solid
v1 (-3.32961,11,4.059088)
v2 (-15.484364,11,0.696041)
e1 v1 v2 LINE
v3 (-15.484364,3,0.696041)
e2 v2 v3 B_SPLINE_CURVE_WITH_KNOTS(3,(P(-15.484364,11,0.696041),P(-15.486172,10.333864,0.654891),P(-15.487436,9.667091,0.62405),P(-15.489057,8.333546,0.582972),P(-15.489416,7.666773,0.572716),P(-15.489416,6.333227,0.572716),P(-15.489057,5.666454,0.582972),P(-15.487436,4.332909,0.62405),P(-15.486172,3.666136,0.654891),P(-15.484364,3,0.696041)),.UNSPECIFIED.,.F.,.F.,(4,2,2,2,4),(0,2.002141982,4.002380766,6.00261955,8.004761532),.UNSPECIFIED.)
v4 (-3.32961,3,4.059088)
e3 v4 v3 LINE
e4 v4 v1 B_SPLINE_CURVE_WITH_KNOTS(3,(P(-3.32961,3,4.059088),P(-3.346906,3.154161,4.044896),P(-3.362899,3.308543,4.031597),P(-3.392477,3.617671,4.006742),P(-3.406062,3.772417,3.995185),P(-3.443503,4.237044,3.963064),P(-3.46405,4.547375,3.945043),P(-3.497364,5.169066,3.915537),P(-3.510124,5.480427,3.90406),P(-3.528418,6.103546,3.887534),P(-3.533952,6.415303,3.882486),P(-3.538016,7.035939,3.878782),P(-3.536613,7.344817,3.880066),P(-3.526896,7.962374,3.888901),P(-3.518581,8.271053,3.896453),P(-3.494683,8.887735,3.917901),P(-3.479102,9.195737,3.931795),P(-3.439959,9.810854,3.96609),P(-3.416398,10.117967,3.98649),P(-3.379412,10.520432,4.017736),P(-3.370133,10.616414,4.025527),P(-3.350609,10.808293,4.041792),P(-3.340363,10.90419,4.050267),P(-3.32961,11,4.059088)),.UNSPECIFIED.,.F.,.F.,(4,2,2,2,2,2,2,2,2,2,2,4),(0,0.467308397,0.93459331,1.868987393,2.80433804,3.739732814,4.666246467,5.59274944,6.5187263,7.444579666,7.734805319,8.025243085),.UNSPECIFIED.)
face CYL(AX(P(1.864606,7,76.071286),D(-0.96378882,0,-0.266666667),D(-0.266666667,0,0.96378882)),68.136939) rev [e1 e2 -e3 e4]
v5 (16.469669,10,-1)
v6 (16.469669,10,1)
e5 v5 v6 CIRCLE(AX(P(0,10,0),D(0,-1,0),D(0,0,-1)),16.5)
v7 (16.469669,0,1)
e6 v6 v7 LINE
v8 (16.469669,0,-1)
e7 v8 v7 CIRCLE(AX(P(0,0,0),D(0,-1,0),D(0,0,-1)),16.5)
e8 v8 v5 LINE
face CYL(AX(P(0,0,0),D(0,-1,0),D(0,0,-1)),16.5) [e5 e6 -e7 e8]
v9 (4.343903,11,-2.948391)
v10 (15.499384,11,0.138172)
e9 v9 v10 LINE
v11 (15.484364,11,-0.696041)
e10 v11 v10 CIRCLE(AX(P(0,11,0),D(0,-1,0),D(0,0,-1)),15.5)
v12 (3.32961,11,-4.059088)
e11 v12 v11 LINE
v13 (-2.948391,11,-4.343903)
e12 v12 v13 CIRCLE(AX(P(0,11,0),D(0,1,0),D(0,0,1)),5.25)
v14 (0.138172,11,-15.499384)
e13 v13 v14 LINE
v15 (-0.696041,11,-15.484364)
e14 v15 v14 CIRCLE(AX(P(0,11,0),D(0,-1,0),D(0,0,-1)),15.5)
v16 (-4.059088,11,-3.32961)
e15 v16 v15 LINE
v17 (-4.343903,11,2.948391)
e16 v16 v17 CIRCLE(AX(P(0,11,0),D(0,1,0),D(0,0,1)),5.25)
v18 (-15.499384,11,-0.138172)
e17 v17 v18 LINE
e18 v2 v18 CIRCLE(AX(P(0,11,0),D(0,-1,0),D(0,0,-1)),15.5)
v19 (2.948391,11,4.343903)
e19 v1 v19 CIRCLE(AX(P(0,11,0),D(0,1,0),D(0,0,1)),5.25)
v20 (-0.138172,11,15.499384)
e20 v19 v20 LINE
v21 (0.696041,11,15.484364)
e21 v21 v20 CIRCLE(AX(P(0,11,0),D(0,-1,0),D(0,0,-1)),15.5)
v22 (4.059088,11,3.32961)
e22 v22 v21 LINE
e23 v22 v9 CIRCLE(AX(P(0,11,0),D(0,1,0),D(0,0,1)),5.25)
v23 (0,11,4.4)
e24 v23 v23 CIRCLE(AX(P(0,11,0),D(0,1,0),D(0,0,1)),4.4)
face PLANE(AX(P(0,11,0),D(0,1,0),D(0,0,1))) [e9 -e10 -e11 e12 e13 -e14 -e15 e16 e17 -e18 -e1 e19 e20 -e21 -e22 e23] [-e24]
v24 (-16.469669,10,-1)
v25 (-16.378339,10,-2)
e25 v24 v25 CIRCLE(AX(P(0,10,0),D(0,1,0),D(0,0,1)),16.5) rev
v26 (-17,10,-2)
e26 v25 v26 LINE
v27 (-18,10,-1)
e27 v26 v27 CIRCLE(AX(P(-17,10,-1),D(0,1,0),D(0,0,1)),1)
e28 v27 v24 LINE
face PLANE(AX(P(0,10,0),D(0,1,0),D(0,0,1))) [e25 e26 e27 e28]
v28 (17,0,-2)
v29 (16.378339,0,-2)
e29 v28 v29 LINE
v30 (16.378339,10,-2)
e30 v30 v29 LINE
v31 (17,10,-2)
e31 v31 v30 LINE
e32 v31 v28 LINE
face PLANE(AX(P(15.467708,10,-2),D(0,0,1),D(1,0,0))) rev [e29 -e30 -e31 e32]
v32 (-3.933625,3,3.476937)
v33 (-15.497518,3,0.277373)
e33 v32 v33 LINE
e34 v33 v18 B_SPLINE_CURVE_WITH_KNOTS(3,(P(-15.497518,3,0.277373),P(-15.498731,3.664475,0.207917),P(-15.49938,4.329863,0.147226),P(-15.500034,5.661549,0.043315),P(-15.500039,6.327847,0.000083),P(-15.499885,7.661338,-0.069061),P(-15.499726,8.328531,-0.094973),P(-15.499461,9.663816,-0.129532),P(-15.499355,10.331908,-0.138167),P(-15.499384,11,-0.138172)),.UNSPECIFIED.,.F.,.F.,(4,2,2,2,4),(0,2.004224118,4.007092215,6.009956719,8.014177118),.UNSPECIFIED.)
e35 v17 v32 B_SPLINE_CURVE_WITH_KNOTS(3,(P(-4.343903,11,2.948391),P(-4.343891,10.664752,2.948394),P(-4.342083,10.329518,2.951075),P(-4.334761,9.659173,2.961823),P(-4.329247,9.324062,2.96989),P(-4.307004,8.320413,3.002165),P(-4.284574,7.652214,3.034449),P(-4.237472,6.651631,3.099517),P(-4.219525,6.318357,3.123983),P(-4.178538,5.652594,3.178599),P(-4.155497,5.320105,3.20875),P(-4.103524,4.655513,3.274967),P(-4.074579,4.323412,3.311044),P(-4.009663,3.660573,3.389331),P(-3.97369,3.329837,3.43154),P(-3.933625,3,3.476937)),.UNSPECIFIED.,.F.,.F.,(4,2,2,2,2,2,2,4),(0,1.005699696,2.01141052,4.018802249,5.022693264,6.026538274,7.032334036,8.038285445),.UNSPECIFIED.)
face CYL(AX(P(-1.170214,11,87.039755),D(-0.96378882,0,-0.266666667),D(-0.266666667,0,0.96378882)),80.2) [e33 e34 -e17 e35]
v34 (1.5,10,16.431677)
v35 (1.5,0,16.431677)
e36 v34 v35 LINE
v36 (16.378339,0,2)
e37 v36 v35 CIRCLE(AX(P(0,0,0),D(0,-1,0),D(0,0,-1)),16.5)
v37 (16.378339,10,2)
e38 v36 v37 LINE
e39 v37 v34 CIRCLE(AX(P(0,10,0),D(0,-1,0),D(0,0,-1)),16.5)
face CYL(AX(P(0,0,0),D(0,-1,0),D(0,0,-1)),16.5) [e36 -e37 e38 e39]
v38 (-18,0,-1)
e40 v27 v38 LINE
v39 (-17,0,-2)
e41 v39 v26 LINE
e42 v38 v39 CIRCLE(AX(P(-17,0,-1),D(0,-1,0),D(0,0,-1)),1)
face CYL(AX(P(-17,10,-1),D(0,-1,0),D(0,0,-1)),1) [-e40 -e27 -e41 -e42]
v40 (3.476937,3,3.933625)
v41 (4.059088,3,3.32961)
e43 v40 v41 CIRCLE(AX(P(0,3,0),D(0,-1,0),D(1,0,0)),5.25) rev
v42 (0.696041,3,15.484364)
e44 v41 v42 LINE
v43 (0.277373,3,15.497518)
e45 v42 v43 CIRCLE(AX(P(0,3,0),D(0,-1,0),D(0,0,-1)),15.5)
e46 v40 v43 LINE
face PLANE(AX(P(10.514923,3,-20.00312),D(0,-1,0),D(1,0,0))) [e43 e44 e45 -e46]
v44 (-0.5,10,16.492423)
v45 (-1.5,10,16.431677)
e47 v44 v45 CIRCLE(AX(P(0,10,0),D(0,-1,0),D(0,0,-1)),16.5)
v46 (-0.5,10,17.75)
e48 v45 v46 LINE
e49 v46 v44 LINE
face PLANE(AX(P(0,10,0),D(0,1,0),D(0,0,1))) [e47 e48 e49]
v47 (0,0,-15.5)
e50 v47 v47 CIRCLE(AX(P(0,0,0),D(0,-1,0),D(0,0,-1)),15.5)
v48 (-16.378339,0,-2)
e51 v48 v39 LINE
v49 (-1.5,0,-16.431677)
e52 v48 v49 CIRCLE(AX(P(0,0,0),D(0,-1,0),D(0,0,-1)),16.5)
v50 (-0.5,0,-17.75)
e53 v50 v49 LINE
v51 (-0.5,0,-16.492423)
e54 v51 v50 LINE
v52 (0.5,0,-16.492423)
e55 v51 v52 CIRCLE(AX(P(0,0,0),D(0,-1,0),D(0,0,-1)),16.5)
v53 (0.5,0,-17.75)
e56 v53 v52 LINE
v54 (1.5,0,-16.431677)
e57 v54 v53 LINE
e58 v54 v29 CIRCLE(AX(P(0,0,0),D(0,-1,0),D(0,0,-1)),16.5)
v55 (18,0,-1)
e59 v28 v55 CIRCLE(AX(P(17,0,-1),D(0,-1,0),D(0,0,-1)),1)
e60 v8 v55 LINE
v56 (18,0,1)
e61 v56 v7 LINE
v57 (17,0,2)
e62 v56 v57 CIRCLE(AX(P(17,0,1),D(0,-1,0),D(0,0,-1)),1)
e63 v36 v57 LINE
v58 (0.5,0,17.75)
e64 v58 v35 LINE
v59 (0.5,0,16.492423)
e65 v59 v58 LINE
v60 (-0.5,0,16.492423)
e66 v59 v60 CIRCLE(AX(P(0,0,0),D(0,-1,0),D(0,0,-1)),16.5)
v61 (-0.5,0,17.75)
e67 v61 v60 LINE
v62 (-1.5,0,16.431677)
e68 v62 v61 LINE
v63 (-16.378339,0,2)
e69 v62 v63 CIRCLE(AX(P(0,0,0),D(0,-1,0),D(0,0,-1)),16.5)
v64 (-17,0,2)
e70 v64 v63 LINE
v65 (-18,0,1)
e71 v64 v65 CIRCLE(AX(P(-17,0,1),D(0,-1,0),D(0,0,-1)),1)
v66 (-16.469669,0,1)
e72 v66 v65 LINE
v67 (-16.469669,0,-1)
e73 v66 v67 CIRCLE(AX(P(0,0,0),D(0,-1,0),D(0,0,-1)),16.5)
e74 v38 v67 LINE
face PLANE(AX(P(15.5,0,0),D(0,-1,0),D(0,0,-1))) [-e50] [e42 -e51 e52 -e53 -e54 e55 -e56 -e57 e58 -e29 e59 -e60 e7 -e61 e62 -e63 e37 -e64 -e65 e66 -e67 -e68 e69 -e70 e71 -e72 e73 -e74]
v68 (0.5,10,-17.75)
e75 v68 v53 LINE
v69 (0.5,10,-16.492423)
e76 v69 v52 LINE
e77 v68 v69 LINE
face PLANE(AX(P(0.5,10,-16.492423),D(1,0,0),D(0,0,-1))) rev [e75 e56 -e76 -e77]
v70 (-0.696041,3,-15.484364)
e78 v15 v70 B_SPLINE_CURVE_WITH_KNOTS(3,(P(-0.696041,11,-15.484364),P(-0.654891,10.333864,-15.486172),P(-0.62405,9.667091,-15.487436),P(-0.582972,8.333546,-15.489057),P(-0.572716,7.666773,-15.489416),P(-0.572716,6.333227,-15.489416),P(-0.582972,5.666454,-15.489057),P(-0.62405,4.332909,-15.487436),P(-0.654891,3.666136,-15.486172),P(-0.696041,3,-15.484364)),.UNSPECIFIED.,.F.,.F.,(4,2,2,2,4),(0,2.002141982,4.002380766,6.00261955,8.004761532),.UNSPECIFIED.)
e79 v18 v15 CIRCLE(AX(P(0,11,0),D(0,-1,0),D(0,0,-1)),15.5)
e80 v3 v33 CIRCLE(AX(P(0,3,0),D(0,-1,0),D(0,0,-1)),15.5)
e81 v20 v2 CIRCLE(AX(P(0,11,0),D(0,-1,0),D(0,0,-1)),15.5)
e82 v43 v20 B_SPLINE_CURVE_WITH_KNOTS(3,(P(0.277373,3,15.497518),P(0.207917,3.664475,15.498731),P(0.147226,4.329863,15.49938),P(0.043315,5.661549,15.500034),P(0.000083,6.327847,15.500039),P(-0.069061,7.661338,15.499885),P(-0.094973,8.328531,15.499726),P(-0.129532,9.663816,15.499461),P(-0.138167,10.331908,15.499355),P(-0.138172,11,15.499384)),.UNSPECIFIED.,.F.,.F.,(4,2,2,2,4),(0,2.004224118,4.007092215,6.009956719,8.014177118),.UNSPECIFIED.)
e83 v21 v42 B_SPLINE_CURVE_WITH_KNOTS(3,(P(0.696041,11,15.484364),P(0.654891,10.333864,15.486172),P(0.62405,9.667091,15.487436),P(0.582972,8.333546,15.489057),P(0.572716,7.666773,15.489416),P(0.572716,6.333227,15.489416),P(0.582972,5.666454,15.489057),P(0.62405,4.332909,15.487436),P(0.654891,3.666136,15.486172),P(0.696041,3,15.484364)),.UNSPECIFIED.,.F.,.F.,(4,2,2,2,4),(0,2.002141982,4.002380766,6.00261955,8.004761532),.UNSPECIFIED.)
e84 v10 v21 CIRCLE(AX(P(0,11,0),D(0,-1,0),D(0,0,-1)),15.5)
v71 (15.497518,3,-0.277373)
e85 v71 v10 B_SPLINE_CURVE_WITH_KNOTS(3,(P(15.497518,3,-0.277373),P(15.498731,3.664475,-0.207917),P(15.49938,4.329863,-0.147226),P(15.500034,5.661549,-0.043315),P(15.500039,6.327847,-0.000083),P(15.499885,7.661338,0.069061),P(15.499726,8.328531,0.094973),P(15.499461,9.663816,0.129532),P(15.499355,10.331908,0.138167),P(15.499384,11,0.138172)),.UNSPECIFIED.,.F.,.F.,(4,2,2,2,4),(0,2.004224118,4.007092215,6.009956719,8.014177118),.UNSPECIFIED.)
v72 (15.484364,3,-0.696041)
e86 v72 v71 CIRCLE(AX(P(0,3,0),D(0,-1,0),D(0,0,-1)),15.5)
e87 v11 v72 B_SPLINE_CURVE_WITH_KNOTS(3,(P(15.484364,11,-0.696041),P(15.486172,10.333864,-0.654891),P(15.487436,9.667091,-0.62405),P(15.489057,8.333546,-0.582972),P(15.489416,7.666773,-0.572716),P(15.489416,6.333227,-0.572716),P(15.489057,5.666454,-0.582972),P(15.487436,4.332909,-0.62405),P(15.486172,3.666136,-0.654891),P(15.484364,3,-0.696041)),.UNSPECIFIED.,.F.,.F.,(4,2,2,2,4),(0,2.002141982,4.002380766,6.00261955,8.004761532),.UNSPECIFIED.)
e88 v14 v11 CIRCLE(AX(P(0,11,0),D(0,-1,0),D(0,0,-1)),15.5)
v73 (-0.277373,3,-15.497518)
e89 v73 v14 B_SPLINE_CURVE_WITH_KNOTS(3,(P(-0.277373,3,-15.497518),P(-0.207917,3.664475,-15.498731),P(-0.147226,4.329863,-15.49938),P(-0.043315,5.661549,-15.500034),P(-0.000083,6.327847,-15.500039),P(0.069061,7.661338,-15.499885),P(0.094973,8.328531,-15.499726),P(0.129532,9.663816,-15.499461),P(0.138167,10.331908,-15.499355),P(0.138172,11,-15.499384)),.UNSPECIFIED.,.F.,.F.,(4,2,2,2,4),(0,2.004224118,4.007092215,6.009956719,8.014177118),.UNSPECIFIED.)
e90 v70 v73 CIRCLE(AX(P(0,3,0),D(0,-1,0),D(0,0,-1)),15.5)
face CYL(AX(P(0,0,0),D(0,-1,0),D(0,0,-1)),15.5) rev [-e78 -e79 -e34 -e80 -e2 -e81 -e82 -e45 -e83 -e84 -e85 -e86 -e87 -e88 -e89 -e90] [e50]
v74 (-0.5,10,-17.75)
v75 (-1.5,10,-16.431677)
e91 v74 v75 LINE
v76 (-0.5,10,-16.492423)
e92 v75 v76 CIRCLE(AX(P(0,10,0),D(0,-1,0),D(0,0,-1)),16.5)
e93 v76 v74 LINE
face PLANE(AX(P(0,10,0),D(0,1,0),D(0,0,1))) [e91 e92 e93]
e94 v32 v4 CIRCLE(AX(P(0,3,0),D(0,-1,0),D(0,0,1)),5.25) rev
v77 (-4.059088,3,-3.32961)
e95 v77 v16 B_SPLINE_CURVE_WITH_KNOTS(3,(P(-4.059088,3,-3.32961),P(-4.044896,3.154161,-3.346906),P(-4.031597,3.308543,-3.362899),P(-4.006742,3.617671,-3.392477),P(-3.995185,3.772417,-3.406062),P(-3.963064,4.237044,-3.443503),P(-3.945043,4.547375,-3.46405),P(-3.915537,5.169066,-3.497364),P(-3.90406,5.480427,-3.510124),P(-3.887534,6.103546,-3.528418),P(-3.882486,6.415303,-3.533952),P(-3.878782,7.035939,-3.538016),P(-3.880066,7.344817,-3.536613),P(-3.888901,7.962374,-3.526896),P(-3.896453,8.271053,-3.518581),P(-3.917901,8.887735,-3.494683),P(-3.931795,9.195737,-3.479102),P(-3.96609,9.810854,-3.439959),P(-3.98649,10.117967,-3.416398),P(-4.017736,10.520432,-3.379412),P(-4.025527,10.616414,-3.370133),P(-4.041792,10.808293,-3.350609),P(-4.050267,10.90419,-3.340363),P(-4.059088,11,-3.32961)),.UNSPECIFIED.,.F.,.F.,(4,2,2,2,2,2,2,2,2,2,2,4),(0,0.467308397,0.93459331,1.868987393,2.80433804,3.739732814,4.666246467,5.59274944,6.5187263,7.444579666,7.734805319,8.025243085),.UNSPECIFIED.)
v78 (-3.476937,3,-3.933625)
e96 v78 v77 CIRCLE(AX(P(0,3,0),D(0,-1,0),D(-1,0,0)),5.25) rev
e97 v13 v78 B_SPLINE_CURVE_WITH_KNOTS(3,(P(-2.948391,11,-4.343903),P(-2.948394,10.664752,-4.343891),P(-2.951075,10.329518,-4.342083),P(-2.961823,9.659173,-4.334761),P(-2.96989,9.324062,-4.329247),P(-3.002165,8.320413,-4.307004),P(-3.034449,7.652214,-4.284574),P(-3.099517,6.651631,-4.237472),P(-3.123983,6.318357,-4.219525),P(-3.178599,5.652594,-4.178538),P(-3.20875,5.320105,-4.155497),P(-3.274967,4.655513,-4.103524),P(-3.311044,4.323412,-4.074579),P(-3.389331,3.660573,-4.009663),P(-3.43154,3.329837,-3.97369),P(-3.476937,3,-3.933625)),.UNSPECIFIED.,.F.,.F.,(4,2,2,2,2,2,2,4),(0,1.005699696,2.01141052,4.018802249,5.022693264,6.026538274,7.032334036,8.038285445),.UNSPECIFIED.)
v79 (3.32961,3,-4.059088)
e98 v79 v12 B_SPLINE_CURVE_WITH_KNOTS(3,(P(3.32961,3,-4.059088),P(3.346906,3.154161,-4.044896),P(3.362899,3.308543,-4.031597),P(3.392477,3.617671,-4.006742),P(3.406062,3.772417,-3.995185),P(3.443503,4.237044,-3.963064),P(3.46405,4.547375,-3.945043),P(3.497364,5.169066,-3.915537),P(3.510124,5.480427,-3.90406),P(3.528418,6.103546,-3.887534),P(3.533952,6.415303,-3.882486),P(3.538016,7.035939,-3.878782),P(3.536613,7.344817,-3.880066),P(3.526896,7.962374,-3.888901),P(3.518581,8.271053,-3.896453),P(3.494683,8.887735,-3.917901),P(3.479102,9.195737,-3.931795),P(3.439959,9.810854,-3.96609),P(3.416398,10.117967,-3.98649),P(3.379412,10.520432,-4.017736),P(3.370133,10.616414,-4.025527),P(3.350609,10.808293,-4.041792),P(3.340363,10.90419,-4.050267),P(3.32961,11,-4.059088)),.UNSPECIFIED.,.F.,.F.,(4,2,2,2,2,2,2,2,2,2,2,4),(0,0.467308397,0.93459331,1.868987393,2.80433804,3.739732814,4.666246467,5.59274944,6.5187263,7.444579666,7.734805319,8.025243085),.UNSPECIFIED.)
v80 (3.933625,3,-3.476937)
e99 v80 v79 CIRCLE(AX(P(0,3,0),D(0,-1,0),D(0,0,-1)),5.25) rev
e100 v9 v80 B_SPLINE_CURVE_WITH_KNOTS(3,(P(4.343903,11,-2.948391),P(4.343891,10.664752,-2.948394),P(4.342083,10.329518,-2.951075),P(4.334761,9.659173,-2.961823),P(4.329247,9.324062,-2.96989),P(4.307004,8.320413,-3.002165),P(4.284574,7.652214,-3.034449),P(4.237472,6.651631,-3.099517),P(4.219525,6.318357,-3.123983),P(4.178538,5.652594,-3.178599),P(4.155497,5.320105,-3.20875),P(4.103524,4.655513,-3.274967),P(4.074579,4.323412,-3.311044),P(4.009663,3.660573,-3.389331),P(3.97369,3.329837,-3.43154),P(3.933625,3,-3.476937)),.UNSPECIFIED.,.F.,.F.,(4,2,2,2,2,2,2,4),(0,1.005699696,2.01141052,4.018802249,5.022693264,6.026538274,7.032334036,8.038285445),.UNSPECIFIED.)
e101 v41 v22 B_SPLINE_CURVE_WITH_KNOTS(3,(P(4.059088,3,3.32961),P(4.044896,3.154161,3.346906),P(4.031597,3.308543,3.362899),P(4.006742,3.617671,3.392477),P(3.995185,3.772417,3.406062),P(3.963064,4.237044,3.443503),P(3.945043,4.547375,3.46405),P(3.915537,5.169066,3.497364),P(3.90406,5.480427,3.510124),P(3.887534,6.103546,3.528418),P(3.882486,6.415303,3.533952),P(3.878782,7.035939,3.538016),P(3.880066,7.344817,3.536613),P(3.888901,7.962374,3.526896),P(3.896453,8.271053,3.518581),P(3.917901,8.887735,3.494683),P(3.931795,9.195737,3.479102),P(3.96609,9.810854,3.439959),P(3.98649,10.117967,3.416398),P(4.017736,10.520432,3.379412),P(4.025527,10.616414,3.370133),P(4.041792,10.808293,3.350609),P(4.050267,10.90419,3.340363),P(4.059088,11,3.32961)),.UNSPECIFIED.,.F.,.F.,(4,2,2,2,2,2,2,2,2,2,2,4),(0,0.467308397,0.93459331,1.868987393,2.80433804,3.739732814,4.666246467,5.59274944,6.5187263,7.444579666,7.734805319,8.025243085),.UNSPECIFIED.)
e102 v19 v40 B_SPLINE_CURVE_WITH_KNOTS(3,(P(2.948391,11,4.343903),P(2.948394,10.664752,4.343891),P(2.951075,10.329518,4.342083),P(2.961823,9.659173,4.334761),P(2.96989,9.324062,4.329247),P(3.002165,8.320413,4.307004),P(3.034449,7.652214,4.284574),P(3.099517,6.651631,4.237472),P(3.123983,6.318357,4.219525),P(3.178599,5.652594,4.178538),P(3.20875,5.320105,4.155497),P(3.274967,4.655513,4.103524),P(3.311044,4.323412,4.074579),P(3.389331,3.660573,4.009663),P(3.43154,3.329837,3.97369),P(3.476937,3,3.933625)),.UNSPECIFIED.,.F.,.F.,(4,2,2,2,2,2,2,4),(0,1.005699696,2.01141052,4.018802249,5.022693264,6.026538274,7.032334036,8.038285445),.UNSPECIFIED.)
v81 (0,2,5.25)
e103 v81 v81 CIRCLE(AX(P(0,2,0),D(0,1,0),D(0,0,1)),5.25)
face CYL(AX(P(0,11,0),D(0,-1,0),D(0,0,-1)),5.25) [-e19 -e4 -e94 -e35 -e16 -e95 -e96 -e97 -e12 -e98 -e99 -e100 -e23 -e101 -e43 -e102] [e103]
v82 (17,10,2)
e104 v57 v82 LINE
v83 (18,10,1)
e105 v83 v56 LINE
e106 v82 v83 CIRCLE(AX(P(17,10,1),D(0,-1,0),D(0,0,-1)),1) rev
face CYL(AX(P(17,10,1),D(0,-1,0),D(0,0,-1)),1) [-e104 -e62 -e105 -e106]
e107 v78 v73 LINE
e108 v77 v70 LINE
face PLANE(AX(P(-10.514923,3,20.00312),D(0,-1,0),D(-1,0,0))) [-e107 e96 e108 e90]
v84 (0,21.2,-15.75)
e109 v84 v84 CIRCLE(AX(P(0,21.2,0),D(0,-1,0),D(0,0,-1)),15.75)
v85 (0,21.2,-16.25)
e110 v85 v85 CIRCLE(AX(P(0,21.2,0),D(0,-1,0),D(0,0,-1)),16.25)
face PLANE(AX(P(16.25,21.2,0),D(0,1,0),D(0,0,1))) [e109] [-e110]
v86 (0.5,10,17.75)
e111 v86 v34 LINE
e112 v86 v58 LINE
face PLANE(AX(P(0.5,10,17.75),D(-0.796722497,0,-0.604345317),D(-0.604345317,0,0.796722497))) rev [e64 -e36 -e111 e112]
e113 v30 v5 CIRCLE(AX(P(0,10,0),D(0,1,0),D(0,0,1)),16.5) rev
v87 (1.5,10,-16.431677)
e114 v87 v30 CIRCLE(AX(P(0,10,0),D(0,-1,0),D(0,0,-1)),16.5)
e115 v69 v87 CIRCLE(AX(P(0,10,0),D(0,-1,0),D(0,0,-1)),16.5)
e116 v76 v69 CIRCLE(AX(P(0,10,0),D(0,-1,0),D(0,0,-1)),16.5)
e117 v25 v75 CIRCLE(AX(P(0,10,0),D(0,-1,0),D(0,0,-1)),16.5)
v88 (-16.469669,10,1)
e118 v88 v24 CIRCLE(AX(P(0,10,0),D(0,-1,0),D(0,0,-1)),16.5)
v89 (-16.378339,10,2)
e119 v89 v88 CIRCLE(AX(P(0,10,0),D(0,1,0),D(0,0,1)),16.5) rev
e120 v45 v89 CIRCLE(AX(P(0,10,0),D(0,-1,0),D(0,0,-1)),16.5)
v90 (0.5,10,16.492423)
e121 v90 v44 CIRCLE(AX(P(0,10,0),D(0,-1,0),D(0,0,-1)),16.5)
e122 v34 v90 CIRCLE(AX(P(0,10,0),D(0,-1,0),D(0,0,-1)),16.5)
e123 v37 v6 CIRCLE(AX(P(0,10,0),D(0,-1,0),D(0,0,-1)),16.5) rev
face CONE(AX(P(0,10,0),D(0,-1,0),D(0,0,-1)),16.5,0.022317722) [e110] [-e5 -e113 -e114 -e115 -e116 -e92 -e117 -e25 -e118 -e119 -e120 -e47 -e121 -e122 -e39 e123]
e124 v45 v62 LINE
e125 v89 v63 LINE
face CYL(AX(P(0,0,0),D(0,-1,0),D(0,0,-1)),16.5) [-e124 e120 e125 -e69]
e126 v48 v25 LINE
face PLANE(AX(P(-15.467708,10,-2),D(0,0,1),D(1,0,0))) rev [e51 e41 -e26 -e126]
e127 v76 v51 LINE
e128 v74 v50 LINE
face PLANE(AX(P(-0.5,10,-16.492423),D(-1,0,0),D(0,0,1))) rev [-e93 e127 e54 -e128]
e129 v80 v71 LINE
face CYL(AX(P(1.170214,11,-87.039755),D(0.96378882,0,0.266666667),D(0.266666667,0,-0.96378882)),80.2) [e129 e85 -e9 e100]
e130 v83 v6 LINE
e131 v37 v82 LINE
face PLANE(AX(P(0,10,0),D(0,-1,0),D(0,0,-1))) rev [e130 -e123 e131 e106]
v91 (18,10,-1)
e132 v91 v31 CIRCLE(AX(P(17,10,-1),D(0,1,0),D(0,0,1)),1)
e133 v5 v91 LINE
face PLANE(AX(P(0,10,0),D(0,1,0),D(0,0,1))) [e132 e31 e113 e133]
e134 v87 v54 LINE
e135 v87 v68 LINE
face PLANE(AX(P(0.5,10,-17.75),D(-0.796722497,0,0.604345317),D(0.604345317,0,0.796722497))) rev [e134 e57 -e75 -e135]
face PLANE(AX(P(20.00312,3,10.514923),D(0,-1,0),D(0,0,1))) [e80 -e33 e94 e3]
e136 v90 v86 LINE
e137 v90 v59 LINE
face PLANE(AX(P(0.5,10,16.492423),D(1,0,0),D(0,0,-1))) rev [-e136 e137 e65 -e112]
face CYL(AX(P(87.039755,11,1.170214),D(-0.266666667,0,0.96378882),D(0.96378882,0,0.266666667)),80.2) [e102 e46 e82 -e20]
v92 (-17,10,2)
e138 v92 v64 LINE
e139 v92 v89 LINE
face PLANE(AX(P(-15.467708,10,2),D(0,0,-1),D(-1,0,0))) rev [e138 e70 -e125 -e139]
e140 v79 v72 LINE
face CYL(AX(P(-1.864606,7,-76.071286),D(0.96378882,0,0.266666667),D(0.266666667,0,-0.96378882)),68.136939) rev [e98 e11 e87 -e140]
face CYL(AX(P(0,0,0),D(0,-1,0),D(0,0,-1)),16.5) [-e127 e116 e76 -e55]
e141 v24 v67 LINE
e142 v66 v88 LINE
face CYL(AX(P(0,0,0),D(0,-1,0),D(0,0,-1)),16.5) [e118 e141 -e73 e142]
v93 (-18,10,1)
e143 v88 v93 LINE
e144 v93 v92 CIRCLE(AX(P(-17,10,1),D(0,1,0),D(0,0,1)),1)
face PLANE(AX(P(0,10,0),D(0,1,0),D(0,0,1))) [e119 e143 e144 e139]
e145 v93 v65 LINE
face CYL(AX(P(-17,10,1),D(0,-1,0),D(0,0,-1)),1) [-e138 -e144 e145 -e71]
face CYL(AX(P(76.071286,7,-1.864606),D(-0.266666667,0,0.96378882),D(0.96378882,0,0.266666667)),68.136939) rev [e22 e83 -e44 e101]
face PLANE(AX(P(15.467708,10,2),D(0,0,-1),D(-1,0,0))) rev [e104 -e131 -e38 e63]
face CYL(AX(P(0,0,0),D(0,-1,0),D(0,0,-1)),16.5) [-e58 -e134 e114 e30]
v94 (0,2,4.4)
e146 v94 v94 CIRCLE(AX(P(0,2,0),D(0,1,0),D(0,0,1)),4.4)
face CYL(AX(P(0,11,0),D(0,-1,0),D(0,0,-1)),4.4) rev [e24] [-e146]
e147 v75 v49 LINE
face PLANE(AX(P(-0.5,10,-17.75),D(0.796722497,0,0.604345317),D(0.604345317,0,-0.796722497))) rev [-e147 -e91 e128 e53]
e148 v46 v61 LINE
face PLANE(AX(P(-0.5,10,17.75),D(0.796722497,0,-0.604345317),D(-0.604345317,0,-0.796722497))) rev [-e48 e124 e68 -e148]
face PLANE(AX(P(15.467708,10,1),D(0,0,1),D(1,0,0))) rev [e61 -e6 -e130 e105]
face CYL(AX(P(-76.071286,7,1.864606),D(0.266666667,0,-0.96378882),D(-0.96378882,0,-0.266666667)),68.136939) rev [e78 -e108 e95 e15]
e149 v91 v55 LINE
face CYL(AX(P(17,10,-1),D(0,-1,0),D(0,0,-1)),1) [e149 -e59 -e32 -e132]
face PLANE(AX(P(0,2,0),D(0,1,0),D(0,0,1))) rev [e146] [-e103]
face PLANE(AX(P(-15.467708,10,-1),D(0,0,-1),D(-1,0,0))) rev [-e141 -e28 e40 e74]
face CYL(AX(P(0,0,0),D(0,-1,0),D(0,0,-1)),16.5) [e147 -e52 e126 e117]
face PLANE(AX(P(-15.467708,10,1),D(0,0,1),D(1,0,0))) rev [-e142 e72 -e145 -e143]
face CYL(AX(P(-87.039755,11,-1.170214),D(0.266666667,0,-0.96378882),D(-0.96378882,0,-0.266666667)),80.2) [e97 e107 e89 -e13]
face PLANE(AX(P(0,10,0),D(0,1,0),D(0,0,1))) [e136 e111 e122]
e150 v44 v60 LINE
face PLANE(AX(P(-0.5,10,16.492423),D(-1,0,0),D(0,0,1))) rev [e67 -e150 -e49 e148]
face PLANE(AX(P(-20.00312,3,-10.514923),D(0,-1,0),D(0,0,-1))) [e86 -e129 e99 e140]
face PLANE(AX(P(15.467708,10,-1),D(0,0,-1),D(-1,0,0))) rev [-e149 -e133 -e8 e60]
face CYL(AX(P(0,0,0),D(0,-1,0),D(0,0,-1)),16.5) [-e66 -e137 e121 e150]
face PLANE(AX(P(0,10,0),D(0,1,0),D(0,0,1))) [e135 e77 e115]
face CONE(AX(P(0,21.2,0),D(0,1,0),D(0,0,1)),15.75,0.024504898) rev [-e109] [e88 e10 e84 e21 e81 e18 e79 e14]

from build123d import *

# Parameters (mm, degrees)
SKETCH2_W           = 2.532291702
SKETCH2_H           = 1
BOSS_EXTRUDE1_DEPTH = 10
FILLET1_R           = 1
BOSS_EXTRUDE2_START = 2
SKETCH3_R           = 5.25
SKETCH3_R_2         = 4.4
BOSS_EXTRUDE2_DEPTH = 9
BOSS_EXTRUDE3_START = -0.893384
BOSS_EXTRUDE3_DEPTH = 13.479999236
CIRPATTERN2_COUNT   = 4


with BuildPart() as part:
    # Sketch1 → Revolve1 (revolve)
    with BuildSketch(Plane.XY, mode=Mode.PRIVATE) as revolve1_sk:
        Polygon((15.5, 11), (15.5, 0), (16.5, 0), (16.5, 10), (16.25, 21.2), (15.75, 21.2), align=None)
    revolve(revolve1_sk.sketch.rotate(Axis((0, 0, 0), (0, 1, 0)), 90), axis=Axis((0, 0, 0), (0, 1, 0)))

    # Sketch2 → Boss-Extrude1 (add)
    with BuildSketch(Plane(origin=(0, 0, 0), x_dir=(1, 0, 0), z_dir=(0, 1, 0))):
        with Locations((16.733854149, -1.5)):
            Rectangle(SKETCH2_W, SKETCH2_H)
        with Locations((16.733854149, 1.5)):
            Rectangle(SKETCH2_W, SKETCH2_H)
        with Locations((-16.733854149, 1.5)):
            Rectangle(SKETCH2_W, SKETCH2_H)
        with Locations((-16.733854149, -1.5)):
            Rectangle(SKETCH2_W, SKETCH2_H)
        Polygon((0.5, -16.492422502), (0.5, -17.75), (1.5, -16.431676725), align=None)
        Polygon((-0.5, -17.75), (-1.5, -16.431676725), (-0.5, -16.492422502), align=None)
        Polygon((0.5, 17.75), (1.5, 16.431676725), (0.5, 16.492422502), align=None)
        Polygon((-0.5, 16.492422502), (-0.5, 17.75), (-1.5, 16.431676725), align=None)
    extrude(amount=BOSS_EXTRUDE1_DEPTH)

    # Fillet1
    fillet1_edges = [part.edges().sort_by_distance(p)[0] for p in [
        (-18, 5, -2),
        (-18, 5, 2),
        (18, 5, -2),
        (18, 5, 2),
    ]]
    fillet(fillet1_edges, radius=FILLET1_R - 0.0001)  # a hair under: the kernel refuses the full size


with BuildPart() as body_2:
    # Sketch3 → Boss-Extrude2 (new body)
    with BuildSketch(Plane(origin=(0, 0, 0), x_dir=(1, 0, 0), z_dir=(0, 1, 0)).offset(BOSS_EXTRUDE2_START)):
        with Locations(Location((0, 0, 0), (0, 0, 270))):
            Circle(SKETCH3_R)
        with Locations(Location((0, 0, 0), (0, 0, 270))):
            Circle(SKETCH3_R_2, mode=Mode.SUBTRACT)
    extrude(amount=BOSS_EXTRUDE2_DEPTH)


with BuildPart() as body_3:
    # Sketch5 → Boss-Extrude3 (new body)
    with BuildSketch(Plane(origin=(15.902515524, 0, 4.4), x_dir=(0.2666666666666668, 0, -0.9637888196533974), z_dir=(0.9637888196533975, 0, 0.2666666666666668)).offset(BOSS_EXTRUDE3_START)):
        with BuildLine():
            Line((4, 11), (4.8, 11))
            ThreePointArc((4.8, 11), (4.682488051, 7), (4.8, 3))
            Line((4.8, 3), (4.4, 3))
            ThreePointArc((4.4, 3), (4.100062422, 6.995003121), (4, 11))
        make_face()
    extrude(amount=-BOSS_EXTRUDE3_DEPTH)


with BuildPart() as cirpattern2_1:
    # CirPattern2: pattern copy
    add(body_3.part.rotate(Axis((0, 0, 0), (0, 1, 0)), 1 * 360 / CIRPATTERN2_COUNT))


with BuildPart() as cirpattern2_2:
    # CirPattern2: pattern copy
    add(body_3.part.rotate(Axis((0, 0, 0), (0, 1, 0)), 2 * 360 / CIRPATTERN2_COUNT))


with BuildPart() as cirpattern2_3:
    # CirPattern2: pattern copy
    add(body_3.part.rotate(Axis((0, 0, 0), (0, 1, 0)), 3 * 360 / CIRPATTERN2_COUNT))


with BuildPart() as part_1:
    add(part.part)

    # Combine1: union body 2, body 3, CirPattern2_1, CirPattern2_2, CirPattern2_3
    add(body_2.part)
    add(body_3.part)
    add(cirpattern2_1.part)
    add(cirpattern2_2.part)
    add(cirpattern2_3.part)


solid = part_1.part
